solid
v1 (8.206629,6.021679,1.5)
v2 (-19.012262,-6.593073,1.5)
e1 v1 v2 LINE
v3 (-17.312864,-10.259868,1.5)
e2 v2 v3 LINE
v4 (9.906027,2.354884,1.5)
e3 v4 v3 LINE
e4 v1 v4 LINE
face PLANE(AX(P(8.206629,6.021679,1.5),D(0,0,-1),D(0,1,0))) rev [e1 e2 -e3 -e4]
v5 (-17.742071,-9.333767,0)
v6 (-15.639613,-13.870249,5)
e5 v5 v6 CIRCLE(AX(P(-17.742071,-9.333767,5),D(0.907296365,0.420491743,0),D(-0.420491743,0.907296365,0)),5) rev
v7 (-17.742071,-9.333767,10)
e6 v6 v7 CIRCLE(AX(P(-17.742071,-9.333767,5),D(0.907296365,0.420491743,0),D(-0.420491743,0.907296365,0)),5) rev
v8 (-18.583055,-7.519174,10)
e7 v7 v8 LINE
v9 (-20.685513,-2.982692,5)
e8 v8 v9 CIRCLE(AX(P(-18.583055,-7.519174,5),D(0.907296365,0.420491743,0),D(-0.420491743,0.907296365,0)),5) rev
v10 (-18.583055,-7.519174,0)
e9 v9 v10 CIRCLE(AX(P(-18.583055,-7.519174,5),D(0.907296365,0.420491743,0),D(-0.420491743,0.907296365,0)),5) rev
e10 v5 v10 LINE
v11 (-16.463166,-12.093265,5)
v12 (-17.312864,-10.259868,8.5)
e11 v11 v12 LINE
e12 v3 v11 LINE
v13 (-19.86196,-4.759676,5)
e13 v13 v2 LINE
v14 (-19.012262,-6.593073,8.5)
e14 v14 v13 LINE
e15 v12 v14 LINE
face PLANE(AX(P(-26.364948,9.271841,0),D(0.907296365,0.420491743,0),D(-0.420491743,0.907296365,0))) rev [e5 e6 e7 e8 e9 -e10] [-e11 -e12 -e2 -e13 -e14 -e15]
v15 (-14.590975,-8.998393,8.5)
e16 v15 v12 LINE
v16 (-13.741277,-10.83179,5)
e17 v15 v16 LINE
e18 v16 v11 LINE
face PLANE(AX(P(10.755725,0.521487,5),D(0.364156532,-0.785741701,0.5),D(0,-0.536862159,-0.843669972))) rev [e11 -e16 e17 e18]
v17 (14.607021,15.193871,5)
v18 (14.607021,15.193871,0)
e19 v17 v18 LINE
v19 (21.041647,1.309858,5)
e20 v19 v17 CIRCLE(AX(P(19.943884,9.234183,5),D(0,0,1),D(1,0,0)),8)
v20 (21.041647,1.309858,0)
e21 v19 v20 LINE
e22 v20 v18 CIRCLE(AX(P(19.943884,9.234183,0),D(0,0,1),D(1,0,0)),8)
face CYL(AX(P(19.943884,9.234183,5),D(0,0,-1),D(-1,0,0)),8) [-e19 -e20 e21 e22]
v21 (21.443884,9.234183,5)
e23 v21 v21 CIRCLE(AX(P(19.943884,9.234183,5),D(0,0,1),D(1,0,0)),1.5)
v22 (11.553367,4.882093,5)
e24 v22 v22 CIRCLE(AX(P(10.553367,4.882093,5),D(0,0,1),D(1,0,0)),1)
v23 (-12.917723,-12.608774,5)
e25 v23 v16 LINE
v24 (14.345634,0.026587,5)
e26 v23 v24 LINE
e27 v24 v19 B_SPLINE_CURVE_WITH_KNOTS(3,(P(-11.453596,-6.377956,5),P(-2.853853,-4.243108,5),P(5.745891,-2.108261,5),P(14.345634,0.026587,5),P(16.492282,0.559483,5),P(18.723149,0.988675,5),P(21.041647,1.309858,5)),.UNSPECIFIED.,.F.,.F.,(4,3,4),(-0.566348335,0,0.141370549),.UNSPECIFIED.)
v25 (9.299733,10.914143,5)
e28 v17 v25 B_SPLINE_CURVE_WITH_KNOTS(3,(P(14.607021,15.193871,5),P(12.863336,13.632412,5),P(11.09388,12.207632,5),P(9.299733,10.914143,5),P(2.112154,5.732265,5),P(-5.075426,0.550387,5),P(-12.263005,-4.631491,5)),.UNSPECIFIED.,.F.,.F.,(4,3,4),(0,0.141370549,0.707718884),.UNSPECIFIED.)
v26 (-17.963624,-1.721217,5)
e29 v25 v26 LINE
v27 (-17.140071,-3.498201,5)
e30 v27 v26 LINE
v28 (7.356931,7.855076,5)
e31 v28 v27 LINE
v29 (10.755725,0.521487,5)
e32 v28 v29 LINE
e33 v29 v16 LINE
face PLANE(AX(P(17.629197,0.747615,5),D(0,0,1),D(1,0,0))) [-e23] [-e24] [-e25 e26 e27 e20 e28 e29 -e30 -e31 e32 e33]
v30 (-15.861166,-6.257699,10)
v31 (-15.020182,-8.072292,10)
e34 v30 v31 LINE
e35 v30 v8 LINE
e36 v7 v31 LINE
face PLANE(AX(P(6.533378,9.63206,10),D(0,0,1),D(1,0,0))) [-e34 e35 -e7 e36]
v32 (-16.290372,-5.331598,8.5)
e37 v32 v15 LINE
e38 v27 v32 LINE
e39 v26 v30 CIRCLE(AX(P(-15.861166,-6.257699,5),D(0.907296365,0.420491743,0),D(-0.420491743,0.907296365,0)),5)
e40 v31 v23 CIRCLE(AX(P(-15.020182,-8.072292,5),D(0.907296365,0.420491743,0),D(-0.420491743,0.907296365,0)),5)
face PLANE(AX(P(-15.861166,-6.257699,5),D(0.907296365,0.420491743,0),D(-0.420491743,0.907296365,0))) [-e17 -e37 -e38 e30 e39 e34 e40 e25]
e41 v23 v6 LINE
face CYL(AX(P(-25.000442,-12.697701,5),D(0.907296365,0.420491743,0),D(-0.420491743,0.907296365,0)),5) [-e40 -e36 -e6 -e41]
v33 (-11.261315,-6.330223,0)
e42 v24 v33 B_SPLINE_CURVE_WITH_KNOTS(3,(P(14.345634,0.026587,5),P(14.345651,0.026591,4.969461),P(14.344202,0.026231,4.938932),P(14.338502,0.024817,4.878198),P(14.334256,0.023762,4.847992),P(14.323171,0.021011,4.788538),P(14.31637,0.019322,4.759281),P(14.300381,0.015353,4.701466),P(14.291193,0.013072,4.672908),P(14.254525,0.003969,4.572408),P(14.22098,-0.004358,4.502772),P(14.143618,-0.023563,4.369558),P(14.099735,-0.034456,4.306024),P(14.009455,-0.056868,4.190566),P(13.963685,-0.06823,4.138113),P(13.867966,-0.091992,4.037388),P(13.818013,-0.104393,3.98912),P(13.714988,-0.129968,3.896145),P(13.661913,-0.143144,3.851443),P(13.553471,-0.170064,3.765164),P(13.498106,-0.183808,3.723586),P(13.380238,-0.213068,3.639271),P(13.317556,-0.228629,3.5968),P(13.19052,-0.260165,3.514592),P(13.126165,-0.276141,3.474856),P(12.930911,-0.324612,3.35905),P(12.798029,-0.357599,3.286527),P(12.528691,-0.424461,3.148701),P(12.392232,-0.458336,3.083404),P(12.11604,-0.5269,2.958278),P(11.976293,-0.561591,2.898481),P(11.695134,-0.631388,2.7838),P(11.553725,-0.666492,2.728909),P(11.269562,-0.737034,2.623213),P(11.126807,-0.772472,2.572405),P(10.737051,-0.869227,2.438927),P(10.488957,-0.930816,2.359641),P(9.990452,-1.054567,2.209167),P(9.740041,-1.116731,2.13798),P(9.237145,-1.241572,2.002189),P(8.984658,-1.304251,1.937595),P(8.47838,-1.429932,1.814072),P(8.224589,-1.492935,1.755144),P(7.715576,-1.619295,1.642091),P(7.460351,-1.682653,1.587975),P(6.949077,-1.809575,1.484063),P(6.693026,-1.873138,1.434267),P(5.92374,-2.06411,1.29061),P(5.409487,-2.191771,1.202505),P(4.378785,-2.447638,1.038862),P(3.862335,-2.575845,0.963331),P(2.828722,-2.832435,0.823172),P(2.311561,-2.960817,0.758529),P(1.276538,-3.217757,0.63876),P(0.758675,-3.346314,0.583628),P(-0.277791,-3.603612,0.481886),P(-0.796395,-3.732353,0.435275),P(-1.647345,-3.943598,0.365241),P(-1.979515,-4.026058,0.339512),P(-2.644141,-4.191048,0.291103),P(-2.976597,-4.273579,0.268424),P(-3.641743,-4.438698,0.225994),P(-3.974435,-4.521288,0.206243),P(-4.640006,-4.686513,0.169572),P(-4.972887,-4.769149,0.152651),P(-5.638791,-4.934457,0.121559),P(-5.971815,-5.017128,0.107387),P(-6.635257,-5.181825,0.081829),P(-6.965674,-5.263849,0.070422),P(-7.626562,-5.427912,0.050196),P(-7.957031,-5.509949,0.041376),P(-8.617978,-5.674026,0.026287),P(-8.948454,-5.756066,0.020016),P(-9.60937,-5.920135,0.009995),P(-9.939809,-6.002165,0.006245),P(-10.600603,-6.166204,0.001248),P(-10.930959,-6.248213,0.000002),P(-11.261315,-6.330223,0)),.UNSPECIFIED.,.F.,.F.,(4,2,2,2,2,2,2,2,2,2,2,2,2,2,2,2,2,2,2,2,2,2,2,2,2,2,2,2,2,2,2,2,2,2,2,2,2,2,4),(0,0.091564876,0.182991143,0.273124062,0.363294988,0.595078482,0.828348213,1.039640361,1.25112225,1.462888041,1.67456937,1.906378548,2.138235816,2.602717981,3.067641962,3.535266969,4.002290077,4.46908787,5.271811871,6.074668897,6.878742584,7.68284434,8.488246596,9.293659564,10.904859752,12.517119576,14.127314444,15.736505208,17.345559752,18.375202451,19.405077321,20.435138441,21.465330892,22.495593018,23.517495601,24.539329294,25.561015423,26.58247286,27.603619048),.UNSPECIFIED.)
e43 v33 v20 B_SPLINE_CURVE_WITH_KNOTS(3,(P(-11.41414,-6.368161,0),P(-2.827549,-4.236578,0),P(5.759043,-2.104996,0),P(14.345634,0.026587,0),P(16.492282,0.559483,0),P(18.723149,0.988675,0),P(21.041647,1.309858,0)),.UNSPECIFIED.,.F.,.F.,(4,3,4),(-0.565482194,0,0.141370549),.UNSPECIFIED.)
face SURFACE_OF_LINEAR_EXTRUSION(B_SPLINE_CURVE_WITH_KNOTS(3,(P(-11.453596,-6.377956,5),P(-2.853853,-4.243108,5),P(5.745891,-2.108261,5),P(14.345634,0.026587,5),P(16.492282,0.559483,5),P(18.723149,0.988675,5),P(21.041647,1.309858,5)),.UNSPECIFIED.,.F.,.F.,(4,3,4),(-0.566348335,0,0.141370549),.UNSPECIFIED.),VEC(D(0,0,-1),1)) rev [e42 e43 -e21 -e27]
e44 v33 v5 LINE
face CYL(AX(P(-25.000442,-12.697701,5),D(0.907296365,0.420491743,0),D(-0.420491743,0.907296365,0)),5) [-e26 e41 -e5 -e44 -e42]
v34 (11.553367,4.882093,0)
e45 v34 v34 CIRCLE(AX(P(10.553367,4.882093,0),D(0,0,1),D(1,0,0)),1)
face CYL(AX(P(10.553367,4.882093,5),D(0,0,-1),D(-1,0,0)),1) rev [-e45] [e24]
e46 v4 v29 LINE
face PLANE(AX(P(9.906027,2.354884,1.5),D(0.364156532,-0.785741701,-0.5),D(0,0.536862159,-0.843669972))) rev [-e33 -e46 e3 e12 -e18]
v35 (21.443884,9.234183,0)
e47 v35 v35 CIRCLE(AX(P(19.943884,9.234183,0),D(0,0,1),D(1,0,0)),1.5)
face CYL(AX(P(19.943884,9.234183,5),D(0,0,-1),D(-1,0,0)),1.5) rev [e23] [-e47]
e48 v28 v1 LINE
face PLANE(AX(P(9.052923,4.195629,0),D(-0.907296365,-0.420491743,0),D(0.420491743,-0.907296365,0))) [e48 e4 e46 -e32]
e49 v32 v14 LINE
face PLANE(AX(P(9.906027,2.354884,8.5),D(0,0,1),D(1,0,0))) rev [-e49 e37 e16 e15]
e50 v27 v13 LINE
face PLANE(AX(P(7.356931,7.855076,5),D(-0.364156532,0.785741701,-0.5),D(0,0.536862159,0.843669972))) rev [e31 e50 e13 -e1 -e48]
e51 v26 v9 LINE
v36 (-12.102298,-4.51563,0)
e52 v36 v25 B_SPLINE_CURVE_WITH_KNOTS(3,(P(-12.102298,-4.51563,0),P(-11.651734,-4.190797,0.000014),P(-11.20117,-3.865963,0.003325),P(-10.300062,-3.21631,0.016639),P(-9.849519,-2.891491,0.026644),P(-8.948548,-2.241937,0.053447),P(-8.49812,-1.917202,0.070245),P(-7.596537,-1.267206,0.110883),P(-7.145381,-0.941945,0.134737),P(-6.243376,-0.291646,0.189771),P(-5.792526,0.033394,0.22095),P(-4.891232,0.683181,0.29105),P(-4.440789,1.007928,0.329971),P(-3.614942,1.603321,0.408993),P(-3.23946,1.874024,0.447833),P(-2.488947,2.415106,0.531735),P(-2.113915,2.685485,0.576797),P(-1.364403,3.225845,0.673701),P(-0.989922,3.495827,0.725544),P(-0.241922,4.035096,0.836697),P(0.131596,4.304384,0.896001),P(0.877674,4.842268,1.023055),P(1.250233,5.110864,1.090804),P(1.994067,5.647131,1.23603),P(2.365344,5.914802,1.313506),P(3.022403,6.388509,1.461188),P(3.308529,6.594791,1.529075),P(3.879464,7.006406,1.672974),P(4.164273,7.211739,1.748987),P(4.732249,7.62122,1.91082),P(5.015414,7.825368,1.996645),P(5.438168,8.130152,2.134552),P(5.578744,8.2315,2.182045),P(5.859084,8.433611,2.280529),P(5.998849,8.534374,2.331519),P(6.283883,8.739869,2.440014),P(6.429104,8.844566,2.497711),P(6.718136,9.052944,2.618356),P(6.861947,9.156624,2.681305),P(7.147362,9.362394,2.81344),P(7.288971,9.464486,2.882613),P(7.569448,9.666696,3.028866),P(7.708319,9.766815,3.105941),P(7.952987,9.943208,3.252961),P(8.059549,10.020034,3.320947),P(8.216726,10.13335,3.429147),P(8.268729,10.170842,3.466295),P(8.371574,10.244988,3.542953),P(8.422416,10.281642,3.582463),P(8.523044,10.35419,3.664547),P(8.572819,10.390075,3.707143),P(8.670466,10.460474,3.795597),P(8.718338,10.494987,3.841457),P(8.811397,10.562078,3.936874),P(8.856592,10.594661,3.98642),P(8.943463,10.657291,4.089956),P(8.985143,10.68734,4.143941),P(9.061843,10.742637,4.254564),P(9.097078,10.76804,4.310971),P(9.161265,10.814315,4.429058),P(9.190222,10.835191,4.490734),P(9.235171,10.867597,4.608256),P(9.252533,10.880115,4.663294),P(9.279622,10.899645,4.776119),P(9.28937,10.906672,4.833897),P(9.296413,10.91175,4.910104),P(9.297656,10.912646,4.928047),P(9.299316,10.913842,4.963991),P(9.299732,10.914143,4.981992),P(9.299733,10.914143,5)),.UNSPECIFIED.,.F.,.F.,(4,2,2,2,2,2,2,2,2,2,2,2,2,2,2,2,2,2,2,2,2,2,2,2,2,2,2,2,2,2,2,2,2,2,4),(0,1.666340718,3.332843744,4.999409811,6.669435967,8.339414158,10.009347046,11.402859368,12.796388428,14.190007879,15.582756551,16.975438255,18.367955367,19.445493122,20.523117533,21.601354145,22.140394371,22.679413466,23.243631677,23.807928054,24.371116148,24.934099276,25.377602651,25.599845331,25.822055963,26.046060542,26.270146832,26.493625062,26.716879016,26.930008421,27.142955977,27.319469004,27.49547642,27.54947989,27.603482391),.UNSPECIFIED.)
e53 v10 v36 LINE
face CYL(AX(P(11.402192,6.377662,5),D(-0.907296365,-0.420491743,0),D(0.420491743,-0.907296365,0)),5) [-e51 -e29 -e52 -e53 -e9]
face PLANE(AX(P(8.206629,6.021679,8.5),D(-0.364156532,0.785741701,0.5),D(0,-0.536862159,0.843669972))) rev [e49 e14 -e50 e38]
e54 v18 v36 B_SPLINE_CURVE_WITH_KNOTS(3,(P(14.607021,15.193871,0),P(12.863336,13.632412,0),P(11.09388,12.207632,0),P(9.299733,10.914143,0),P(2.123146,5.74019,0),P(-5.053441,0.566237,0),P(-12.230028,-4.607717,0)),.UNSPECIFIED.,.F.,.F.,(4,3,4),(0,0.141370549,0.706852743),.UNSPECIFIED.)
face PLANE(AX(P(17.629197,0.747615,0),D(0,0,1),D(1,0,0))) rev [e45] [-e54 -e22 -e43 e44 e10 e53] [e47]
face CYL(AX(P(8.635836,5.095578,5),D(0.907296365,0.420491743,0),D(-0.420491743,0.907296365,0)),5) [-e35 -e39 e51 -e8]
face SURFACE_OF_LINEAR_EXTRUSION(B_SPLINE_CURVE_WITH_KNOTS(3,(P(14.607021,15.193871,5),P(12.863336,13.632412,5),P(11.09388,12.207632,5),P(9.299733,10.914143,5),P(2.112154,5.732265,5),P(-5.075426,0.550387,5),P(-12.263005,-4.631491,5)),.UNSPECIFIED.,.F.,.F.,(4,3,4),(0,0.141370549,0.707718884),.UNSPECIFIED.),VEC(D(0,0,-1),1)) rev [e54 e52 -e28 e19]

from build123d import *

# Parameters (mm, degrees)
ESQUISSE1_R             = 1.5
ESQUISSE1_R_2           = 1
BOSS_EXTRU_1_DEPTH      = 5
ENL_V_MAT_EXTRU_1_DEPTH = 5
ESQUISSE5_W             = 5
ESQUISSE5_H             = 12
BOSS_EXTRU_2_DEPTH      = 30
CONG_3_START            = -20.022088667
CONG_3_DEPTH            = 7.142932423
CONG_3_START_2          = -12.879156244
CONG_3_2_DEPTH          = 25.906077345
CONG_3_3_OUTLINE_R      = 1
CONG_3_3_OUTLINE_R_2    = 1.5
CONG_3_3_DEPTH          = 5
CONG_4_START            = -20.022088667
CONG_4_DEPTH            = 30
CONG_4_2_DEPTH          = 7.14293242
CONG_4_START_2          = -12.879156247
CONG_4_3_DEPTH          = 25.906077346
CONG_4_4_OUTLINE_R      = 1
CONG_4_4_OUTLINE_R_2    = 1.5
CONG_4_4_DEPTH          = 5
ENL_V_START             = -27
ENL_V_MAT_EXTRU_2_DEPTH = 27
ENL_V_MAT_EXTRU_3_DEPTH = 30


with BuildPart() as part:
    # Esquisse1 → Boss.-Extru.1 (new body)
    with BuildSketch(Plane.XY):
        with BuildLine():
            Line((-22.897983435, -17.234182679), (14.345633901, 0.026586982))
            add(Edge.make_bspline(
                [(14.345633901, 0.026586982), (16.492281726, 0.559482648), (18.723148816, 0.988675042), (21.041646725, 1.309858226)],
                knots=[0, 0, 0, 0, 0.141370549, 0.141370549, 0.141370549, 0.141370549], degree=3))
            ThreePointArc((21.041646725, 1.309858226), (27.202255265, 12.598116604), (14.60702072, 15.193871131))
            add(Edge.make_bspline(
                [(14.60702072, 15.193871131), (12.863335774, 13.632412198), (11.093879733, 12.207631723), (9.299732983, 10.914143371)],
                knots=[0, 0, 0, 0, 0.141370549, 0.141370549, 0.141370549, 0.141370549], degree=3))
            Line((9.299732983, 10.914143371), (-27.943884355, -6.346626291))
            Line((-27.943884355, -6.346626291), (-22.897983435, -17.234182679))
        make_face()
        with Locations((19.943884355, 9.234182671)):
            Circle(ESQUISSE1_R, mode=Mode.SUBTRACT)
        with Locations((10.553366977, 4.882093131)):
            Circle(ESQUISSE1_R_2, mode=Mode.SUBTRACT)
    extrude(amount=BOSS_EXTRU_1_DEPTH)

    # Esquisse2 → Enlèv. mat.-Extru.1 (cut)
    with BuildSketch(Plane.XY.offset(5)):
        Polygon((-53.781292167, 9.271840667), (-26.364947587, 9.271840667), (-1.521431989, -44.333091582), (-53.781292167, -44.333091582), align=None)
    extrude(amount=-ENL_V_MAT_EXTRU_1_DEPTH, mode=Mode.SUBTRACT)

    # Esquisse5 → Boss.-Extru.2 (add)
    with BuildSketch(Plane(origin=(-18.165968268, -8.419122963, 0), x_dir=(0, 0, 1), z_dir=(-0.9072963650485315, -0.42049174304583187, 0))):
        with Locations((7.5, -0.008098332)):
            Rectangle(ESQUISSE5_W, ESQUISSE5_H)
    extrude(amount=-BOSS_EXTRU_2_DEPTH)

    # Congé3: read off the stored shape, not the designer's step
    # Congé3 outline → Congé3 (cut)
    with BuildSketch(Plane(origin=(0, 0, 0), x_dir=(-0.4204917430458318, 0.9072963650485315, 0), z_dir=(0.9072963650485315, 0.4204917430458318, 0)).offset(CONG_3_START)):
        with BuildLine():
            Line((5.991901676, 0), (5.991901676, 5))
            ThreePointArc((5.991901676, 5), (4.527435582, 1.464466094), (0.991901676, 0))
            Line((0.991901676, 0), (5.991901676, 0))
        make_face()
    extrude(amount=CONG_3_DEPTH, mode=Mode.SUBTRACT)

    # Cong_3 2 outline → Cong_3 2 (cut)
    with BuildSketch(Plane(origin=(0, 0, 0), x_dir=(-0.4204917430458318, 0.9072963650485315, 0), z_dir=(0.9072963650485315, 0.4204917430458318, 0)).offset(CONG_3_START_2)):
        with BuildLine():
            Line((5.991901676, 0), (5.991901676, 5))
            ThreePointArc((5.991901676, 5), (4.527435582, 1.464466094), (0.991901676, 0))
            Line((0.991901676, 0), (5.991901676, 0))
        make_face()
    extrude(amount=CONG_3_2_DEPTH, mode=Mode.SUBTRACT)

    # Cong_3 3 outline → Cong_3 3 (add)
    with BuildSketch(Plane.XY):
        with BuildLine():
            Line((-18.583054733, -7.519174178), (-15.639612528, -13.870248741))
            Line((-15.639612528, -13.870248741), (14.345633901, 0.026586982))
            add(Edge.make_bspline(
                [(14.345633901, 0.026586982), (16.492281726, 0.559482648), (18.723148816, 0.988675042), (21.041646725, 1.309858226)],
                knots=[0, 0, 0, 0, 0.141370549, 0.141370549, 0.141370549, 0.141370549], degree=3))
            ThreePointArc((21.041646725, 1.309858226), (27.202255265, 12.598116604), (14.60702072, 15.193871131))
            add(Edge.make_bspline(
                [(14.60702072, 15.193871131), (12.863335774, 13.632412198), (11.093879733, 12.207631723), (9.299732983, 10.914143371), (2.165722649, 5.77088557), (-4.968287685, 0.62762777), (-12.102298019, -4.515630031)],
                knots=[0, 0, 0, 0, 0.141370549, 0.141370549, 0.141370549, 0.703497896, 0.703497896, 0.703497896, 0.703497896], degree=3))
            Line((-12.102298019, -4.515630031), (-18.583054733, -7.519174178))
        make_face()
        with Locations((10.553366977, 4.882093131)):
            Circle(CONG_3_3_OUTLINE_R, mode=Mode.SUBTRACT)
        with Locations((19.943884355, 9.234182671)):
            Circle(CONG_3_3_OUTLINE_R_2, mode=Mode.SUBTRACT)
    extrude(amount=CONG_3_3_DEPTH)

    # Congé4: read off the stored shape, not the designer's step
    # Congé4 outline → Congé4 (cut)
    with BuildSketch(Plane(origin=(0, 0, 0), x_dir=(-0.4204917430458318, 0.9072963650485315, 0), z_dir=(0.9072963650485315, 0.4204917430458318, 0)).offset(CONG_4_START)):
        with BuildLine():
            ThreePointArc((-6.008098332, 5), (-4.543632238, 8.535533906), (-1.008098332, 10))
            Line((-1.008098332, 10), (-6.008098332, 10))
            Line((-6.008098332, 10), (-6.008098332, 5))
        make_face()
        with BuildLine():
            ThreePointArc((0.991901676, 10), (4.527435582, 8.535533906), (5.991901676, 5))
            Line((5.991901676, 5), (5.991901676, 10))
            Line((5.991901676, 10), (0.991901676, 10))
        make_face()
    extrude(amount=CONG_4_DEPTH, mode=Mode.SUBTRACT)

    # Cong_4 2 outline → Cong_4 2 (cut)
    with BuildSketch(Plane(origin=(0, 0, 0), x_dir=(-0.4204917430458318, 0.9072963650485315, 0), z_dir=(0.9072963650485315, 0.4204917430458318, 0)).offset(CONG_4_START)):
        with BuildLine():
            ThreePointArc((-1.008098332, 0), (-4.543632238, 1.464466094), (-6.008098332, 5))
            Line((-6.008098332, 5), (-6.008098332, 0))
            Line((-6.008098332, 0), (-1.008098332, 0))
        make_face()
    extrude(amount=CONG_4_2_DEPTH, mode=Mode.SUBTRACT)

    # Cong_4 3 outline → Cong_4 3 (cut)
    with BuildSketch(Plane(origin=(0, 0, 0), x_dir=(-0.42049174304583214, 0.9072963650485313, 0), z_dir=(0.9072963650485314, 0.42049174304583214, 0)).offset(CONG_4_START_2)):
        with BuildLine():
            ThreePointArc((-1.008098332, 0), (-4.543632238, 1.464466094), (-6.008098332, 5))
            Line((-6.008098332, 5), (-6.008098332, 0))
            Line((-6.008098332, 0), (-1.008098332, 0))
        make_face()
    extrude(amount=CONG_4_3_DEPTH, mode=Mode.SUBTRACT)

    # Cong_4 4 outline → Cong_4 4 (add)
    with BuildSketch(Plane.XY):
        with BuildLine():
            Line((-17.742071243, -9.333766915), (-11.261314532, -6.330222769))
            add(Edge.make_bspline(
                [(-11.261314532, -6.330222769), (-2.725665054, -4.211286186), (5.809984423, -2.092349602), (14.345633901, 0.026586982), (16.492281726, 0.559482648), (18.723148816, 0.988675042), (21.041646725, 1.309858226)],
                knots=[-0.562127348, -0.562127348, -0.562127348, -0.562127348, 0, 0, 0, 0.141370549, 0.141370549, 0.141370549, 0.141370549], degree=3))
            ThreePointArc((21.041646725, 1.309858226), (27.202255265, 12.598116604), (14.60702072, 15.193871131))
            add(Edge.make_bspline(
                [(14.60702072, 15.193871131), (12.863335774, 13.632412198), (11.093879733, 12.207631723), (9.299732983, 10.914143371), (2.165722649, 5.77088557), (-4.968287685, 0.62762777), (-12.102298019, -4.515630031)],
                knots=[0, 0, 0, 0, 0.141370549, 0.141370549, 0.141370549, 0.703497896, 0.703497896, 0.703497896, 0.703497896], degree=3))
            Line((-12.102298019, -4.515630031), (-18.583054733, -7.519174178))
            Line((-18.583054733, -7.519174178), (-17.742071243, -9.333766915))
        make_face()
        with Locations((10.553366977, 4.882093131)):
            Circle(CONG_4_4_OUTLINE_R, mode=Mode.SUBTRACT)
        with Locations((19.943884355, 9.234182671)):
            Circle(CONG_4_4_OUTLINE_R_2, mode=Mode.SUBTRACT)
    extrude(amount=CONG_4_4_DEPTH)

    # Esquisse7 → Enlèv. mat.-Extru.2 (cut)
    with BuildSketch(Plane(origin=(9.052922683, 4.195629328, 0), x_dir=(0, 0, -1), z_dir=(0.9072963650485316, 0.42049174304583187, 0)).offset(ENL_V_START)):
        with BuildLine():
            Line((-10, 0.991901676), (-10, -1.008098332))
            ThreePointArc((-10, -1.008098332), (-8.535533906, -4.543632238), (-5, -6.008098332))
            Line((-5, -6.008098332), (-5, 5.991901668))
            ThreePointArc((-5, 5.991901668), (-8.5355339, 4.527435576), (-10, 0.991901676))
        make_face()
    extrude(amount=ENL_V_MAT_EXTRU_2_DEPTH, mode=Mode.SUBTRACT)

    # Esquisse9 → Enlèv. mat.-Extru.3 (cut)
    with BuildSketch(Plane(origin=(-18.165968268, -8.419122963, 0), x_dir=(0, 0, 1), z_dir=(-0.9072963650485315, -0.42049174304583187, 0))):
        Polygon((1.5, -2.028824274), (5, -4.049550216), (8.5, -2.028824274), (8.5, 2.01262761), (5, 4.033353552), (1.5, 2.01262761), align=None)
    extrude(amount=-ENL_V_MAT_EXTRU_3_DEPTH, mode=Mode.SUBTRACT)


solid = part.part
